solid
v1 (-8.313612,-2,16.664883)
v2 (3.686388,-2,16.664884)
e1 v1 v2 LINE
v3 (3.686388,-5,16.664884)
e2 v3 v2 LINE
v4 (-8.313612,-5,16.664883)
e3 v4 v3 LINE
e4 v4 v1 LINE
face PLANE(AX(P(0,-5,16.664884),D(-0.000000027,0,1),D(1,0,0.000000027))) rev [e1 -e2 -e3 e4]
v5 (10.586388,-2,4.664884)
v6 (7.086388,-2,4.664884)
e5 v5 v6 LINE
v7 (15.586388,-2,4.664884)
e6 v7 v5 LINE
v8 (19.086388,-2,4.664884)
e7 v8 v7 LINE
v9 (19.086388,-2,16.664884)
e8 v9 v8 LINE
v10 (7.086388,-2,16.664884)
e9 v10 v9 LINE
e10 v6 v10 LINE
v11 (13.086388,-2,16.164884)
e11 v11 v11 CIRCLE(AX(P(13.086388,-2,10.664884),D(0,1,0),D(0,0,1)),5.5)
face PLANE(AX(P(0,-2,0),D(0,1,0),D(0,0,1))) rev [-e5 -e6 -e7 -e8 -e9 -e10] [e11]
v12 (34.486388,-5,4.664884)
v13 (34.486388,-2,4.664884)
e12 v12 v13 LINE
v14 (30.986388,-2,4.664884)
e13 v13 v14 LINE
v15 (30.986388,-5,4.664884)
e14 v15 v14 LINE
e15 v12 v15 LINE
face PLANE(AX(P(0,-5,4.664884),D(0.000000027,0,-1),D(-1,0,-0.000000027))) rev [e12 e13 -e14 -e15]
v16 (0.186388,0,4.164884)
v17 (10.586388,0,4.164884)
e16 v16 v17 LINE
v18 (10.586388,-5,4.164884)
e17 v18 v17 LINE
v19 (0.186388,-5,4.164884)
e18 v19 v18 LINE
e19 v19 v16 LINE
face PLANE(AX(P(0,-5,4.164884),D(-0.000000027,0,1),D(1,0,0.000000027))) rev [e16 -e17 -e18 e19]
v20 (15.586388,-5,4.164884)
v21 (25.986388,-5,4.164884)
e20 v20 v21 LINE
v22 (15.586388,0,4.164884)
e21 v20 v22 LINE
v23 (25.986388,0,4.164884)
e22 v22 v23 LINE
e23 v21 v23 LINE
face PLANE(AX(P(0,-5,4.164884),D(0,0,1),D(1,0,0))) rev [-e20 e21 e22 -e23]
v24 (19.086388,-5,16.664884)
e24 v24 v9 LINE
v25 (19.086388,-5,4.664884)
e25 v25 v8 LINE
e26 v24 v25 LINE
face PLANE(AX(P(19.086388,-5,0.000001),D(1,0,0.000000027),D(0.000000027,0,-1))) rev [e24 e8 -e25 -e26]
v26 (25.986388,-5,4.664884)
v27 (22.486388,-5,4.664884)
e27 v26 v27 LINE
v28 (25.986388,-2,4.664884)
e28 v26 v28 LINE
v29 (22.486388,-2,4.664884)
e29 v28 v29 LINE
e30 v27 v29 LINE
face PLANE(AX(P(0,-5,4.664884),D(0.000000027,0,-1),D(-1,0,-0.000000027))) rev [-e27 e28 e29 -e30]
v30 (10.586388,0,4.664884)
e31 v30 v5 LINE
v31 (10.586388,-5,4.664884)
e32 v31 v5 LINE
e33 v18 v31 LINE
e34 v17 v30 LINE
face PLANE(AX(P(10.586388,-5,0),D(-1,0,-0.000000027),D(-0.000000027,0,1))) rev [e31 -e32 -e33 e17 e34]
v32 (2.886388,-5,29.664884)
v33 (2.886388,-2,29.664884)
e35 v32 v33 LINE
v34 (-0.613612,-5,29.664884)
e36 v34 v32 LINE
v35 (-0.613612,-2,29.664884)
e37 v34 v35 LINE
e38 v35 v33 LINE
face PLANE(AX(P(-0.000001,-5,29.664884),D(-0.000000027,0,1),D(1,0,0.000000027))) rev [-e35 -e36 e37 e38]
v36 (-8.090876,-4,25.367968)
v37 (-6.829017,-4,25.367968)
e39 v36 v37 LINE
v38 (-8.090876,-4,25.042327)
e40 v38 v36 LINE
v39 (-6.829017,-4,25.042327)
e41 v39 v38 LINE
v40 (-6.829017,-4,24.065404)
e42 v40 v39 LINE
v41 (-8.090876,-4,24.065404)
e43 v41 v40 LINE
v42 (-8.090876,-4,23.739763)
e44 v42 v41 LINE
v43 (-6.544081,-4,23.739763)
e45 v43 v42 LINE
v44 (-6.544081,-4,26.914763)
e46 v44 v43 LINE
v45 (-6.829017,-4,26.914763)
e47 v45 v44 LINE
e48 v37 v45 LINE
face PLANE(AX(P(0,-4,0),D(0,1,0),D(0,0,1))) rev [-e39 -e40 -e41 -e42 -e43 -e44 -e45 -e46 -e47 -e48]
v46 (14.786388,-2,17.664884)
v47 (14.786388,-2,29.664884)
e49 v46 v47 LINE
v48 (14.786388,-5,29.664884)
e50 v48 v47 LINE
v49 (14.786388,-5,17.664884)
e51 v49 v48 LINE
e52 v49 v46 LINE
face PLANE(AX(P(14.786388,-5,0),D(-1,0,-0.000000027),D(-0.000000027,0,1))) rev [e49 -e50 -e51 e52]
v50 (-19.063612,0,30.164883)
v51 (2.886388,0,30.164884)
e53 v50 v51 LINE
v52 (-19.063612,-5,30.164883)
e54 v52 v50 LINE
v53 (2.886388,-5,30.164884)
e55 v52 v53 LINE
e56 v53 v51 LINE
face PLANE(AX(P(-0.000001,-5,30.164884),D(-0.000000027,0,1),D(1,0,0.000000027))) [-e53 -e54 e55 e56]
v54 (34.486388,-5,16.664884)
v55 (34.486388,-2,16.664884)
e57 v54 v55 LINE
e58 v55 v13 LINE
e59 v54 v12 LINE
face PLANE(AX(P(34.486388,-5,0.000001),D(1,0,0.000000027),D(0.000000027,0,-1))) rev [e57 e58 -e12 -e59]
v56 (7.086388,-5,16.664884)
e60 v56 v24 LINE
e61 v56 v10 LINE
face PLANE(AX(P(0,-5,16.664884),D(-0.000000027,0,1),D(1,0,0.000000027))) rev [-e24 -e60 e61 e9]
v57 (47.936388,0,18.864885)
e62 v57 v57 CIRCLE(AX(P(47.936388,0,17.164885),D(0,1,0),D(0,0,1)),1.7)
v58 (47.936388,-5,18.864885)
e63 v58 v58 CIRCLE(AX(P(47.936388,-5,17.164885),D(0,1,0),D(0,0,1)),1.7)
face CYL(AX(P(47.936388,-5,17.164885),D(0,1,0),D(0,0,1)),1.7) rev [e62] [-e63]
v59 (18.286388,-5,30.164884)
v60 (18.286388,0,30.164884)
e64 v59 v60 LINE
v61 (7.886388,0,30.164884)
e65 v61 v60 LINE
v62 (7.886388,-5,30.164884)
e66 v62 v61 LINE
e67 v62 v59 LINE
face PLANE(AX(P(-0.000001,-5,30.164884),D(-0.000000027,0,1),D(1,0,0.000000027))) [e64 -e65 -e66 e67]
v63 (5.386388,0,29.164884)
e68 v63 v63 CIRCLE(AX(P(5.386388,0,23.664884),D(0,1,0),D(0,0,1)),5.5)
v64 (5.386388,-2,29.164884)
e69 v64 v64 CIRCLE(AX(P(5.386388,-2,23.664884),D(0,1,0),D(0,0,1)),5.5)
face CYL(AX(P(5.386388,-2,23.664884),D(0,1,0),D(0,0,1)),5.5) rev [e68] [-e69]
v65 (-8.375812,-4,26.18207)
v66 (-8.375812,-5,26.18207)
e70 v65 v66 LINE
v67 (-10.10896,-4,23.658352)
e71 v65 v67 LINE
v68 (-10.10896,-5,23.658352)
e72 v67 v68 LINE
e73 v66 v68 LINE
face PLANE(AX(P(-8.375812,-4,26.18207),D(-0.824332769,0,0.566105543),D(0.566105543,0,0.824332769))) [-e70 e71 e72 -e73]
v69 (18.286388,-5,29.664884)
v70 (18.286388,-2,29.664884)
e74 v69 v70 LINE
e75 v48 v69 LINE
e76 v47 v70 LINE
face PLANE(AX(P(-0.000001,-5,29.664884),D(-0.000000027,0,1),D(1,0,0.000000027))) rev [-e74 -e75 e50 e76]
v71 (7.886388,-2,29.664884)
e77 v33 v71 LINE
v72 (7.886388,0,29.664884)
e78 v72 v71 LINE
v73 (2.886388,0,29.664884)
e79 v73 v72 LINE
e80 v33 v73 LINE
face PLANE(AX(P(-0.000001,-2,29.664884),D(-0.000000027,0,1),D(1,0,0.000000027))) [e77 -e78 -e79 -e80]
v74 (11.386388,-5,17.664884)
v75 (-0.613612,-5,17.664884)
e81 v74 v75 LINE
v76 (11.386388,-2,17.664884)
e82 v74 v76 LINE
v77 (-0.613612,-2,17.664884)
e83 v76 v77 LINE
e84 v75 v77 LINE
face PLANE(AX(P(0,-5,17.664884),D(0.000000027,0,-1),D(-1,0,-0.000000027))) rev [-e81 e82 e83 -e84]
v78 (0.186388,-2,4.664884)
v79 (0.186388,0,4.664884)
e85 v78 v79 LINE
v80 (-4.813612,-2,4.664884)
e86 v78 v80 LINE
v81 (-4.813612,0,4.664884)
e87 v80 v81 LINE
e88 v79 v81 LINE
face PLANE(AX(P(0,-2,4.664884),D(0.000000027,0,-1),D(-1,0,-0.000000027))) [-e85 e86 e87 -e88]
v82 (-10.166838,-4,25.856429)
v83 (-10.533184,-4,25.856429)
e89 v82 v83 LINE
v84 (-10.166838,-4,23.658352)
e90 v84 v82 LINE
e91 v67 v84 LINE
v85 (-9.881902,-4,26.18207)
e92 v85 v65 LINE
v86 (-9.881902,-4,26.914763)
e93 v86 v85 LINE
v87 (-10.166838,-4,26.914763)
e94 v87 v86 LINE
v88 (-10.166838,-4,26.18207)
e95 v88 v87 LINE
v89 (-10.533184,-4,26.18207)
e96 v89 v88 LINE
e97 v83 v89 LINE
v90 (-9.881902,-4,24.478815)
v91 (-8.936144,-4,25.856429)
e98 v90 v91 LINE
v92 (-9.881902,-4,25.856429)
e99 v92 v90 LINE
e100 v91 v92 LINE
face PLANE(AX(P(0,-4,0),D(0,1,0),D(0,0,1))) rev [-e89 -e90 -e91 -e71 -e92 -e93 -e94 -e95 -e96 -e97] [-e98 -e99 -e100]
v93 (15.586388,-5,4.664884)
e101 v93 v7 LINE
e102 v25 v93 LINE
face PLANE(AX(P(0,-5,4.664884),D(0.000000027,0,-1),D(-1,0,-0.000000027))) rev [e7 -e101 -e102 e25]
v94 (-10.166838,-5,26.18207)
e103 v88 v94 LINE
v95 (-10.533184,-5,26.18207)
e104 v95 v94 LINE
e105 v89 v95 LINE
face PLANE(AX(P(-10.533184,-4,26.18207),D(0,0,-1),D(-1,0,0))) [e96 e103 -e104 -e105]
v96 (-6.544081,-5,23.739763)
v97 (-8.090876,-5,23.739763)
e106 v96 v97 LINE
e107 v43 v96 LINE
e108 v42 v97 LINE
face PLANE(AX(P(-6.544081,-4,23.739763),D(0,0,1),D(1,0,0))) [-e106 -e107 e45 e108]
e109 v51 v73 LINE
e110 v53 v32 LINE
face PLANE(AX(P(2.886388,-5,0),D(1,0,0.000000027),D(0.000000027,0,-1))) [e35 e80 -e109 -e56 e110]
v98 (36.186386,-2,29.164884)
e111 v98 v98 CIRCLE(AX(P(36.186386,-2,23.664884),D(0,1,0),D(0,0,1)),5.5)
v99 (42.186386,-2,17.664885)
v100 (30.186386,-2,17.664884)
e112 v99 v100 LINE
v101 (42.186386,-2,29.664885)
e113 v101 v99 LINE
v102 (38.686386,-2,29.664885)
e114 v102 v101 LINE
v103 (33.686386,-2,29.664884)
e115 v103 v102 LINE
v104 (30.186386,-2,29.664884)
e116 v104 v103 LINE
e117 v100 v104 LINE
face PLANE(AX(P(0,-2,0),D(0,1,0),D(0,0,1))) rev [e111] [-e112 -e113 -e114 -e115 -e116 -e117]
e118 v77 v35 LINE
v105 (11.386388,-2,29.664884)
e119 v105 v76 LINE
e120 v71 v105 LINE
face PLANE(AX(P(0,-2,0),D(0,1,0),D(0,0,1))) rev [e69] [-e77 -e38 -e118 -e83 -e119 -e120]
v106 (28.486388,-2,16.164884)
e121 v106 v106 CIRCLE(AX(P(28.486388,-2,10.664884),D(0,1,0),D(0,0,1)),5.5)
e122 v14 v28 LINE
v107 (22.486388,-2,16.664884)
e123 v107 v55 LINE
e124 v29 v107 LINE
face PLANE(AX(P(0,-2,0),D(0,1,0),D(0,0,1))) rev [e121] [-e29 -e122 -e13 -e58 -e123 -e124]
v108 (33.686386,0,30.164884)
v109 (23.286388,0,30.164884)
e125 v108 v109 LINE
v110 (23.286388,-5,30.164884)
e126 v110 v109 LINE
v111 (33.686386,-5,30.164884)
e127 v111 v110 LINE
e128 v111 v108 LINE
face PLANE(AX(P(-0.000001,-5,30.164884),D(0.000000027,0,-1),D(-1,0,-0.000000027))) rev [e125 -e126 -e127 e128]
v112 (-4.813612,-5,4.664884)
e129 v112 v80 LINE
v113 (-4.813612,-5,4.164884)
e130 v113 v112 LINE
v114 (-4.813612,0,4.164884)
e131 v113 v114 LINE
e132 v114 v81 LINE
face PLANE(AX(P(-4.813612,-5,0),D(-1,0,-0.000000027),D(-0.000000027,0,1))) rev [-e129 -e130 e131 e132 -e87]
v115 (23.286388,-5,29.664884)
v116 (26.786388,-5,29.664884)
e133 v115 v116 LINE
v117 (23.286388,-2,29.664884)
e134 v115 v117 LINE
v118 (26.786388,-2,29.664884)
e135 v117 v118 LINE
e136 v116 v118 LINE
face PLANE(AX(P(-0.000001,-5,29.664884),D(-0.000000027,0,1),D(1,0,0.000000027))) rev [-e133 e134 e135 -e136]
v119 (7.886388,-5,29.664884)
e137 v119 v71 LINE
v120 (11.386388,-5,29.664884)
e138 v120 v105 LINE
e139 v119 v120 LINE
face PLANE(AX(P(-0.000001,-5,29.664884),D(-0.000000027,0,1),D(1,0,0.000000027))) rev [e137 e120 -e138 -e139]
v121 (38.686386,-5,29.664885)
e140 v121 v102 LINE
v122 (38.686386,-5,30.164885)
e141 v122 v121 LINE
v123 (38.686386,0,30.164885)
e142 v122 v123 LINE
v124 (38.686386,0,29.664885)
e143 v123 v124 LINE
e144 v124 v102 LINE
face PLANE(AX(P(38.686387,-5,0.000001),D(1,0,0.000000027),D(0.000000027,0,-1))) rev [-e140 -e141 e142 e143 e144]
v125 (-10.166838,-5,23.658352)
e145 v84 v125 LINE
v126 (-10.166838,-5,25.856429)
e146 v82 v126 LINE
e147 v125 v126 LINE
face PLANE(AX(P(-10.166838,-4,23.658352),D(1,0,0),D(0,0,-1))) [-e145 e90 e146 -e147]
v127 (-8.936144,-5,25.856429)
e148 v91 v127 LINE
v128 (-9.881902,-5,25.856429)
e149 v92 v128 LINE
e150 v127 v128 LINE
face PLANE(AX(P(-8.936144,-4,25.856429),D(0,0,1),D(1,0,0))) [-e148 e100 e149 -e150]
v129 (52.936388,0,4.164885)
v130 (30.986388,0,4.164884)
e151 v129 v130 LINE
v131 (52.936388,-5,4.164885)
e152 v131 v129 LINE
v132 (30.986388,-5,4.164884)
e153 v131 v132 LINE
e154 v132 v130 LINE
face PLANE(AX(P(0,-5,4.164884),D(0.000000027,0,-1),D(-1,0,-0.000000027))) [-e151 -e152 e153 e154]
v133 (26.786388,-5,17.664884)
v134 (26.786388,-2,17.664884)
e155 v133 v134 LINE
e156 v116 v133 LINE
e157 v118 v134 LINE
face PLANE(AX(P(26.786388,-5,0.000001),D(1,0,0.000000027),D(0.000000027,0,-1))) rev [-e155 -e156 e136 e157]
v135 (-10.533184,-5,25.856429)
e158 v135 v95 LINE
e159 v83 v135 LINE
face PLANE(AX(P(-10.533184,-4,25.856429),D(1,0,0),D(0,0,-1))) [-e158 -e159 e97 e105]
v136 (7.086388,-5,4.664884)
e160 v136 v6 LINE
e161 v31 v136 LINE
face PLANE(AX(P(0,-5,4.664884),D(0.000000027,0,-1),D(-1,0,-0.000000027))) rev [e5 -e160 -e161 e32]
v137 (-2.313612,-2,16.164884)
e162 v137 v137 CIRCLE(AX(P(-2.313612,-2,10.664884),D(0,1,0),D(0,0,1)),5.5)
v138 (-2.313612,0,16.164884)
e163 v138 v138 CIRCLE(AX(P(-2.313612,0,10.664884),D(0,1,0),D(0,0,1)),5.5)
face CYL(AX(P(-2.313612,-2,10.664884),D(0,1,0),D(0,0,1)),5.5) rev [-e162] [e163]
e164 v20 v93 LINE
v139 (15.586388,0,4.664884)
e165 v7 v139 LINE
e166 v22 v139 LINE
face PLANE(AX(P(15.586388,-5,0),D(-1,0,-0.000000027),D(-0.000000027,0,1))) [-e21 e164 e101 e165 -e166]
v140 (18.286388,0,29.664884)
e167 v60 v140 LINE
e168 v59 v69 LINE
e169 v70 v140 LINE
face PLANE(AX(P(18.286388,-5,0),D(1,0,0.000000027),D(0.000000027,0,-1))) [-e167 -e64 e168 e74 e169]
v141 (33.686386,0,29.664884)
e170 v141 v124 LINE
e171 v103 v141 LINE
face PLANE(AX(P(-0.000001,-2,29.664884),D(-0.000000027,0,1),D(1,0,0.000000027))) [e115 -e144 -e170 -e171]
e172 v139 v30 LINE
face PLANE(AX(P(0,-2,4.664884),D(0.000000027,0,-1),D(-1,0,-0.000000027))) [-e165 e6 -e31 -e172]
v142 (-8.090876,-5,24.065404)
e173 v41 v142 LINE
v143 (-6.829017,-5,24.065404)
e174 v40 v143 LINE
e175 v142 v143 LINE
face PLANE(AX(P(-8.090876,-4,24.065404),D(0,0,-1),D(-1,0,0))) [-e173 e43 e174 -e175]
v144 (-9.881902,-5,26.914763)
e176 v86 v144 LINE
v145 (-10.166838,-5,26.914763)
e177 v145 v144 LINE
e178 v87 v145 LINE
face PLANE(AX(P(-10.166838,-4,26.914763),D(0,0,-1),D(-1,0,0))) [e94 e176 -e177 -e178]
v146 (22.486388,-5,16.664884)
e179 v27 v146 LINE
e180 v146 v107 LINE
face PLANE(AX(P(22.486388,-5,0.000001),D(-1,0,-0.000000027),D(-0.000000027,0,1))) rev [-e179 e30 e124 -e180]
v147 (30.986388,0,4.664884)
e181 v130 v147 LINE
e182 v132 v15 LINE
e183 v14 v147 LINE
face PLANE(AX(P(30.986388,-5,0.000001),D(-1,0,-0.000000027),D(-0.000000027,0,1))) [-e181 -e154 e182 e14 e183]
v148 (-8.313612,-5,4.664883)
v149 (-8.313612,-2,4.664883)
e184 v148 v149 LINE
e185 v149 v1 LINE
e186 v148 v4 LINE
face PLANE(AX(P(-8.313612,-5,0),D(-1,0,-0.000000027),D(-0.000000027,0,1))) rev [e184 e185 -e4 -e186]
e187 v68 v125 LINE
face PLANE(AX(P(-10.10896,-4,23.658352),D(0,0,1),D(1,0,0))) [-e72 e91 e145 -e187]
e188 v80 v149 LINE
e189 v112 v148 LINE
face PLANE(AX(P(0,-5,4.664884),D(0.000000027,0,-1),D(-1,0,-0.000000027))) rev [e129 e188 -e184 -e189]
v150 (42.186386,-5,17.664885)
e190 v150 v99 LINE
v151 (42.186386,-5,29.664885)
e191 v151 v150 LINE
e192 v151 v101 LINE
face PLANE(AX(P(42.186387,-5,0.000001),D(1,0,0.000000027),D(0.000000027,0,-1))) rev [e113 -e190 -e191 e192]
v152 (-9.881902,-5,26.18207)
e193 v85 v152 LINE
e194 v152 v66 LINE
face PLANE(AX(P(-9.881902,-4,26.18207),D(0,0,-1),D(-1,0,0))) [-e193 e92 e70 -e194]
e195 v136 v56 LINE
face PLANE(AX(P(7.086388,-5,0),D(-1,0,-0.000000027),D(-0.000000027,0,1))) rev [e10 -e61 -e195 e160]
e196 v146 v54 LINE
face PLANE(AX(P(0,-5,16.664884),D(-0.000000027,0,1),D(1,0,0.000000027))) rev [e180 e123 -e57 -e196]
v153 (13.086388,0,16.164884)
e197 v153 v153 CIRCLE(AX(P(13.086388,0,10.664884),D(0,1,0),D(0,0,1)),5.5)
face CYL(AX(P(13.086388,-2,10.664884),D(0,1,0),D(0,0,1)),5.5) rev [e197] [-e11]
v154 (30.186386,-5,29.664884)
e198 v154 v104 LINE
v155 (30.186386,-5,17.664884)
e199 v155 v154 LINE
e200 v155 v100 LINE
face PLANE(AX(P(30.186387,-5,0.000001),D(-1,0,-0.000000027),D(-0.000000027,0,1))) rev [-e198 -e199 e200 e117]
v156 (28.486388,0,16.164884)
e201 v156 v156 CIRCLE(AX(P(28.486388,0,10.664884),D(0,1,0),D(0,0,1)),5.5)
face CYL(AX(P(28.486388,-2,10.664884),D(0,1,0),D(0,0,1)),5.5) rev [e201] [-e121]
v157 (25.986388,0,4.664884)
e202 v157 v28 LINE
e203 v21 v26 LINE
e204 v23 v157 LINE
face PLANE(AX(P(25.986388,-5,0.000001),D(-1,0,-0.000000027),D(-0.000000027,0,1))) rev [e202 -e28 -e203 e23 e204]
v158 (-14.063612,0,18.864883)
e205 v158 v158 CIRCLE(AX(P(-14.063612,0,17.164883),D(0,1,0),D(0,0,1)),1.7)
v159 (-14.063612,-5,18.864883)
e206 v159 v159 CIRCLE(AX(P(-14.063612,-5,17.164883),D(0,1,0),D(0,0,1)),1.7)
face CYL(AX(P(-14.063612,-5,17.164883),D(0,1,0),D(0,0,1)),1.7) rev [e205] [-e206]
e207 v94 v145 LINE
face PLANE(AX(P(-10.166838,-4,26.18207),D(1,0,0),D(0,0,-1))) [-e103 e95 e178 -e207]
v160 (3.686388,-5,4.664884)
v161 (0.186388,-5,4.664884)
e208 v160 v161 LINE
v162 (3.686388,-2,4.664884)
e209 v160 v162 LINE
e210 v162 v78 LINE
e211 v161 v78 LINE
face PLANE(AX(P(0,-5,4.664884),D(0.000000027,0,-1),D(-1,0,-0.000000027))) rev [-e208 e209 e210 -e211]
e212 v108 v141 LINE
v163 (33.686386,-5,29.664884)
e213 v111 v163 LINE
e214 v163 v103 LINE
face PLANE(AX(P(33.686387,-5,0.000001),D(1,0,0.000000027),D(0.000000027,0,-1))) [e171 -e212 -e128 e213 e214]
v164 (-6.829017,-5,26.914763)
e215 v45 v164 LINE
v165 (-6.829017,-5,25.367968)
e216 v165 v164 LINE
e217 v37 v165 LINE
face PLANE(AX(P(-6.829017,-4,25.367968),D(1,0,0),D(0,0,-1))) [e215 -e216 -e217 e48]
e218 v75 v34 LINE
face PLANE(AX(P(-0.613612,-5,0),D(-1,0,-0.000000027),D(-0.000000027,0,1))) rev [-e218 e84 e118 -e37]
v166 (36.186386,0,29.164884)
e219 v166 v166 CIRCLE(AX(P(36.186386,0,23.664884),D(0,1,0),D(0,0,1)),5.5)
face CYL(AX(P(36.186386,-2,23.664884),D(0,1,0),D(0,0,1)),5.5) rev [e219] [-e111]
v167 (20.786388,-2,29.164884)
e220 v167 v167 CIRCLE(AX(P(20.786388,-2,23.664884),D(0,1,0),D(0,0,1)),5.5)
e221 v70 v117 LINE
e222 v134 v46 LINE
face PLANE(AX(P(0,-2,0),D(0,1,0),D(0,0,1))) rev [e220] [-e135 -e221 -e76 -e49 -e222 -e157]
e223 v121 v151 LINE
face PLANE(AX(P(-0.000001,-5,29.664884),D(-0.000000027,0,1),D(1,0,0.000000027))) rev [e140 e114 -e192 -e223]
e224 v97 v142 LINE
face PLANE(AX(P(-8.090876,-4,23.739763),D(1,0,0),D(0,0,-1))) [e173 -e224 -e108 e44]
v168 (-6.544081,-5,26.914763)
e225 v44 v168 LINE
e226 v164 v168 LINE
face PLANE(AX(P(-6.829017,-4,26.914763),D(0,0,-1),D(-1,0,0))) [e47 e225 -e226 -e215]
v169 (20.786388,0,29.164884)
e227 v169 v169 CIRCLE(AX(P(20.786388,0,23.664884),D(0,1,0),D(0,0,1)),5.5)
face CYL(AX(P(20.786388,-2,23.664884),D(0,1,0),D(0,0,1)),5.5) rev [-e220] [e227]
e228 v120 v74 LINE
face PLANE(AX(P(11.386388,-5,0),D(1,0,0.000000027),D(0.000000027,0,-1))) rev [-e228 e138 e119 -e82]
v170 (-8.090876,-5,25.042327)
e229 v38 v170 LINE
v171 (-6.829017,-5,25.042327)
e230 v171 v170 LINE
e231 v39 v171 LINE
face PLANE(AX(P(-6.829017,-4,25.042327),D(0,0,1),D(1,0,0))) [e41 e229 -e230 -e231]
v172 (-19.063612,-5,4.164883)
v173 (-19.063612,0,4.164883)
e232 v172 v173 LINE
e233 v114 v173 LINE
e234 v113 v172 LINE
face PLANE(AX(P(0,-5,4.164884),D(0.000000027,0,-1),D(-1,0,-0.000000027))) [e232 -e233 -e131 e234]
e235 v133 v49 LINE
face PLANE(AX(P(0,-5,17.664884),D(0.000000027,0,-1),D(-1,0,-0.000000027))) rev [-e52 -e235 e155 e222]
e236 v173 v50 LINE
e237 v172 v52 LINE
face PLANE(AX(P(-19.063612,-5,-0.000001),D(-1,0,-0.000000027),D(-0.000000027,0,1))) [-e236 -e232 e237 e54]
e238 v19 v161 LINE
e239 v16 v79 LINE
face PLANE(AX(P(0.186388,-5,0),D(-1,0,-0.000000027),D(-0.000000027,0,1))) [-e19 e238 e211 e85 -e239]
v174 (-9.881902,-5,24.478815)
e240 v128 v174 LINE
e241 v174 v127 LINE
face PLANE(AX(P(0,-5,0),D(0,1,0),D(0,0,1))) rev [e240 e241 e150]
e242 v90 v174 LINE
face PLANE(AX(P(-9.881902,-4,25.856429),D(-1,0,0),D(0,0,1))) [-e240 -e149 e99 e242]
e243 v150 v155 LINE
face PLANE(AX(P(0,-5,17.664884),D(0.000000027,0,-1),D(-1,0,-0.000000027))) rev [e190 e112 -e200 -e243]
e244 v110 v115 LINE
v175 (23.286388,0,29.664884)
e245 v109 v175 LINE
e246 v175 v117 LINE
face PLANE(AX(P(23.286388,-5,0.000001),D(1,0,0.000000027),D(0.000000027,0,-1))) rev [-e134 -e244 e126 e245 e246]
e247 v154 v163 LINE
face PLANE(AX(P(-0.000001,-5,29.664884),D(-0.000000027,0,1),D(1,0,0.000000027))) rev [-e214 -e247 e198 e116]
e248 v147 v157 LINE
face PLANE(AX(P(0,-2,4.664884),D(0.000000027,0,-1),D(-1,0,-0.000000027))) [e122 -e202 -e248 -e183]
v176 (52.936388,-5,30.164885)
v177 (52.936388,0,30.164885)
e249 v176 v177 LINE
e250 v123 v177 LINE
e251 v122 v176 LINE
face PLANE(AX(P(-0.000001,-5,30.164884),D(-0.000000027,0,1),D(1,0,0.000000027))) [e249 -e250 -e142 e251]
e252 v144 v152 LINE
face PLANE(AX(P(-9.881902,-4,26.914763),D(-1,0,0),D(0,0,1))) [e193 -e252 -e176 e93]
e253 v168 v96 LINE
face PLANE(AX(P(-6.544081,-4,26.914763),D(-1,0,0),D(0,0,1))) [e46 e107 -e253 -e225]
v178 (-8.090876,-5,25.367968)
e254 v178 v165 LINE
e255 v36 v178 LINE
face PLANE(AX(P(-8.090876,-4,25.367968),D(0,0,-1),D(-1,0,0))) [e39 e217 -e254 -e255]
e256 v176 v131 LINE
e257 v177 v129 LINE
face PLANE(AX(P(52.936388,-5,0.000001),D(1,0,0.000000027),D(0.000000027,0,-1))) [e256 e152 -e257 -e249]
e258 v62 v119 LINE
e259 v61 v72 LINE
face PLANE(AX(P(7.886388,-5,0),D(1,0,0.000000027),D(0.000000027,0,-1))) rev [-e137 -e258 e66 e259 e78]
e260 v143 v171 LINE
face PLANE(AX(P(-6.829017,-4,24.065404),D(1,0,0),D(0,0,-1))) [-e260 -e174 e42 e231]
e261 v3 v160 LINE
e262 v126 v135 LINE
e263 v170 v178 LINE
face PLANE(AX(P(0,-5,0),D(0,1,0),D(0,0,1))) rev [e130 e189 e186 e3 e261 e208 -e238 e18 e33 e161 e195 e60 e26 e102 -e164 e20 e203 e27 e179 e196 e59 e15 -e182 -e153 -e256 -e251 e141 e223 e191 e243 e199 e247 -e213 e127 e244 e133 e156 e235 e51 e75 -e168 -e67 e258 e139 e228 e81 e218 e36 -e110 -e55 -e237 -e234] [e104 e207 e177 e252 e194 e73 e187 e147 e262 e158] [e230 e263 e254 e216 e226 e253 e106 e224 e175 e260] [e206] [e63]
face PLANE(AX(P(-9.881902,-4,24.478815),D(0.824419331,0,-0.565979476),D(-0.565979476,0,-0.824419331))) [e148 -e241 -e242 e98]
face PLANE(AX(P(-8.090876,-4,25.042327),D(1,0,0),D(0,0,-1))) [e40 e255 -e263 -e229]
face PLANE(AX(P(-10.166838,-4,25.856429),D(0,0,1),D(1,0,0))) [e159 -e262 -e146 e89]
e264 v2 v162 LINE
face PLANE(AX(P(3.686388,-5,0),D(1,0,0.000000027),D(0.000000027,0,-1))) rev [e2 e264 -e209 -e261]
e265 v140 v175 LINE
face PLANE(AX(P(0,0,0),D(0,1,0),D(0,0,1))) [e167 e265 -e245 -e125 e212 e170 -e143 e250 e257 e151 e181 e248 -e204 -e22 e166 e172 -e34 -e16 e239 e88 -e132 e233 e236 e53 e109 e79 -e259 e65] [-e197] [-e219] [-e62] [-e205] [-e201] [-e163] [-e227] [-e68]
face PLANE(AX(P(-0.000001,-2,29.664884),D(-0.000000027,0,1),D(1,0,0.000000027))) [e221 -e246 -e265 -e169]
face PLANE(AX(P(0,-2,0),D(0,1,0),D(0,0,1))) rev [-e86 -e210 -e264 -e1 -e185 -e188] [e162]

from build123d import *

# Parameters (mm, degrees)
SKETCH1_R               = 5.5
BOSS_EXTRUDE1_DEPTH     = 2
BOSS_EXTRUDE1_2_DEPTH   = 2
BOSS_EXTRUDE1_3_DEPTH   = 2
BOSS_EXTRUDE1_4_DEPTH   = 2
BOSS_EXTRUDE1_5_DEPTH   = 2
BOSS_EXTRUDE1_6_DEPTH   = 2
BOSS_EXTRUDE2_START     = -5
BOSS_EXTRUDE2_OUTLINE_R = 1.7
BOSS_EXTRUDE2_DEPTH     = 5
CUT_EXTRUDE1_DEPTH      = 1


# Read off the part's stored shape, not the designer's step: Boss-Extrude2
with BuildPart() as part:
    # Sketch1 → Boss-Extrude1 (new body)
    with BuildSketch(Plane(origin=(0, 0, 0), x_dir=(1, 0, 0), z_dir=(0, 1, 0))):
        Polygon((3.686387934, -16.664883738), (3.686388262, -4.664883738), (-8.313611738, -4.66488341), (-8.313612066, -16.66488341), align=None)
        with Locations(Location((-2.313611902, -10.664883574, 0), (0, 0, 270))):
            Circle(SKETCH1_R, mode=Mode.SUBTRACT)
    extrude(amount=-BOSS_EXTRUDE1_DEPTH)



with BuildPart() as body_2:
    # Sketch1 → Boss-Extrude1 2 (new body)
    with BuildSketch(Plane(origin=(0, 0, 0), x_dir=(1, 0, 0), z_dir=(0, 1, 0))):
        Polygon((19.086387939, -16.664884095), (19.086388267, -4.664884095), (7.086388267, -4.664883767), (7.086387939, -16.664883767), align=None)
        with Locations(Location((13.086388103, -10.664883931, 0), (0, 0, 270))):
            Circle(SKETCH1_R, mode=Mode.SUBTRACT)
    extrude(amount=-BOSS_EXTRUDE1_2_DEPTH)


with BuildPart() as body_3:
    # Sketch1 → Boss-Extrude1 3 (new body)
    with BuildSketch(Plane(origin=(0, 0, 0), x_dir=(1, 0, 0), z_dir=(0, 1, 0))):
        Polygon((34.486387949, -16.66488445), (34.486388277, -4.66488445), (22.486388277, -4.664884122), (22.486387949, -16.664884122), align=None)
        with Locations(Location((28.486388113, -10.664884286, 0), (0, 0, 270))):
            Circle(SKETCH1_R, mode=Mode.SUBTRACT)
    extrude(amount=-BOSS_EXTRUDE1_3_DEPTH)


with BuildPart() as body_4:
    # Sketch1 → Boss-Extrude1 4 (new body)
    with BuildSketch(Plane(origin=(0, 0, 0), x_dir=(1, 0, 0), z_dir=(0, 1, 0))):
        Polygon((14.786387887, -17.664883977), (14.786387559, -29.664883977), (26.786387559, -29.664884305), (26.786387887, -17.664884305), align=None)
        with Locations(Location((20.786387723, -23.664884141, 0), (0, 0, 270))):
            Circle(SKETCH1_R, mode=Mode.SUBTRACT)
    extrude(amount=-BOSS_EXTRUDE1_4_DEPTH)


with BuildPart() as body_5:
    # Sketch1 → Boss-Extrude1 5 (new body)
    with BuildSketch(Plane(origin=(0, 0, 0), x_dir=(1, 0, 0), z_dir=(0, 1, 0))):
        Polygon((30.186386338, -17.664884333), (30.18638601, -29.664884333), (42.18638601, -29.664884661), (42.186386338, -17.664884661), align=None)
        with Locations(Location((36.186386174, -23.664884497, 0), (0, 0, 270))):
            Circle(SKETCH1_R, mode=Mode.SUBTRACT)
    extrude(amount=-BOSS_EXTRUDE1_5_DEPTH)


with BuildPart() as body_6:
    # Sketch1 → Boss-Extrude1 6 (new body)
    with BuildSketch(Plane(origin=(0, 0, 0), x_dir=(1, 0, 0), z_dir=(0, 1, 0))):
        Polygon((-0.613612103, -17.664883618), (-0.613612431, -29.664883618), (11.386387569, -29.664883947), (11.386387897, -17.664883947), align=None)
        with Locations(Location((5.386387733, -23.664883782, 0), (0, 0, 270))):
            Circle(SKETCH1_R, mode=Mode.SUBTRACT)
    extrude(amount=-BOSS_EXTRUDE1_6_DEPTH)


with BuildPart() as part_1:
    add(part.part)

    add(body_2.part)  # Boss-Extrude2 merges body 2

    add(body_3.part)  # Boss-Extrude2 merges body 3

    add(body_4.part)  # Boss-Extrude2 merges body 4

    add(body_5.part)  # Boss-Extrude2 merges body 5

    add(body_6.part)  # Boss-Extrude2 merges body 6
    # Boss-Extrude2 outline → Boss-Extrude2 (add)
    with BuildSketch(Plane(origin=(0, 0, 0), x_dir=(1, 0, 0), z_dir=(0, 1, 0)).offset(BOSS_EXTRUDE2_START)):
        Polygon((11.386387569, -29.664883947), (7.886387562, -29.664883851), (7.886387555, -30.164883851), (18.286387545, -30.164884073), (18.286387559, -29.664884073), (14.786387559, -29.664883977), (14.786387887, -17.664883977), (26.786387887, -17.664884305), (26.786387559, -29.664884305), (23.286387552, -29.66488421), (23.286387545, -30.16488421), (33.686385997, -30.164884494), (33.68638601, -29.664884428), (30.18638601, -29.664884333), (30.186386338, -17.664884333), (42.186386338, -17.664884661), (42.18638601, -29.664884661), (38.686386004, -29.664884565), (38.686385997, -30.164884565), (52.936387554, -30.164884954), (52.936388265, -4.164885084), (30.986388291, -4.164884354), (30.986388277, -4.664884354), (34.486388277, -4.66488445), (34.486387949, -16.66488445), (22.486387949, -16.664884122), (22.486388277, -4.664884122), (25.986388284, -4.664884218), (25.986388291, -4.164884218), (15.586388281, -4.164884108), (15.586388267, -4.664883999), (19.086388267, -4.664884095), (19.086387939, -16.664884095), (7.086387939, -16.664883767), (7.086388267, -4.664883767), (10.586388274, -4.664883862), (10.586388281, -4.164883862), (0.186388276, -4.164883578), (0.186388262, -4.664883642), (3.686388262, -4.664883738), (3.686387934, -16.664883738), (-8.313612066, -16.66488341), (-8.313611738, -4.66488341), (-4.813611731, -4.664883505), (-4.813611724, -4.164883505), (-19.063611735, -4.164883116), (-19.063612446, -30.164883114), (2.886387555, -30.164883714), (2.886387569, -29.664883714), (-0.613612431, -29.664883618), (-0.613612103, -17.664883618), (11.386387897, -17.664883947), align=None)
        with Locations((47.93638791, -17.164884883)):
            Circle(BOSS_EXTRUDE2_OUTLINE_R, mode=Mode.SUBTRACT)
        with Locations((-14.06361209, -17.164883252)):
            Circle(BOSS_EXTRUDE2_OUTLINE_R, mode=Mode.SUBTRACT)
    extrude(amount=BOSS_EXTRUDE2_DEPTH)

    # Sketch2 → Cut-Extrude1 (cut)
    # profile 1 of 2: a face of its own
    with BuildSketch(Plane(origin=(0, -5, 0), x_dir=(-1, 0, 0), z_dir=(0, -1, 0))):
        Polygon((6.544081332, -23.739762668), (8.090876204, -23.739762668), (8.090876204, -24.065403693), (6.829017229, -24.065403693), (6.829017229, -25.04232677), (8.090876204, -25.04232677), (8.090876204, -25.367967796), (6.829017229, -25.367967796), (6.829017229, -26.914762668), (6.544081332, -26.914762668), align=None)
    # profile 2 of 2: a face of its own
    with BuildSketch(Plane(origin=(0, -5, 0), x_dir=(-1, 0, 0), z_dir=(0, -1, 0))):
        Polygon((10.108960138, -23.658352411), (10.166837742, -23.658352411), (10.166837742, -25.856429335), (10.533183896, -25.856429335), (10.533183896, -26.18207036), (10.166837742, -26.18207036), (10.166837742, -26.914762668), (9.881901845, -26.914762668), (9.881901845, -26.18207036), (8.375812101, -26.18207036), align=None)
        Polygon((9.881901845, -25.856429335), (9.881901845, -24.478815152), (8.936143631, -25.856429335), align=None, mode=Mode.SUBTRACT)
    extrude(amount=-CUT_EXTRUDE1_DEPTH, mode=Mode.SUBTRACT)


solid = part_1.part
